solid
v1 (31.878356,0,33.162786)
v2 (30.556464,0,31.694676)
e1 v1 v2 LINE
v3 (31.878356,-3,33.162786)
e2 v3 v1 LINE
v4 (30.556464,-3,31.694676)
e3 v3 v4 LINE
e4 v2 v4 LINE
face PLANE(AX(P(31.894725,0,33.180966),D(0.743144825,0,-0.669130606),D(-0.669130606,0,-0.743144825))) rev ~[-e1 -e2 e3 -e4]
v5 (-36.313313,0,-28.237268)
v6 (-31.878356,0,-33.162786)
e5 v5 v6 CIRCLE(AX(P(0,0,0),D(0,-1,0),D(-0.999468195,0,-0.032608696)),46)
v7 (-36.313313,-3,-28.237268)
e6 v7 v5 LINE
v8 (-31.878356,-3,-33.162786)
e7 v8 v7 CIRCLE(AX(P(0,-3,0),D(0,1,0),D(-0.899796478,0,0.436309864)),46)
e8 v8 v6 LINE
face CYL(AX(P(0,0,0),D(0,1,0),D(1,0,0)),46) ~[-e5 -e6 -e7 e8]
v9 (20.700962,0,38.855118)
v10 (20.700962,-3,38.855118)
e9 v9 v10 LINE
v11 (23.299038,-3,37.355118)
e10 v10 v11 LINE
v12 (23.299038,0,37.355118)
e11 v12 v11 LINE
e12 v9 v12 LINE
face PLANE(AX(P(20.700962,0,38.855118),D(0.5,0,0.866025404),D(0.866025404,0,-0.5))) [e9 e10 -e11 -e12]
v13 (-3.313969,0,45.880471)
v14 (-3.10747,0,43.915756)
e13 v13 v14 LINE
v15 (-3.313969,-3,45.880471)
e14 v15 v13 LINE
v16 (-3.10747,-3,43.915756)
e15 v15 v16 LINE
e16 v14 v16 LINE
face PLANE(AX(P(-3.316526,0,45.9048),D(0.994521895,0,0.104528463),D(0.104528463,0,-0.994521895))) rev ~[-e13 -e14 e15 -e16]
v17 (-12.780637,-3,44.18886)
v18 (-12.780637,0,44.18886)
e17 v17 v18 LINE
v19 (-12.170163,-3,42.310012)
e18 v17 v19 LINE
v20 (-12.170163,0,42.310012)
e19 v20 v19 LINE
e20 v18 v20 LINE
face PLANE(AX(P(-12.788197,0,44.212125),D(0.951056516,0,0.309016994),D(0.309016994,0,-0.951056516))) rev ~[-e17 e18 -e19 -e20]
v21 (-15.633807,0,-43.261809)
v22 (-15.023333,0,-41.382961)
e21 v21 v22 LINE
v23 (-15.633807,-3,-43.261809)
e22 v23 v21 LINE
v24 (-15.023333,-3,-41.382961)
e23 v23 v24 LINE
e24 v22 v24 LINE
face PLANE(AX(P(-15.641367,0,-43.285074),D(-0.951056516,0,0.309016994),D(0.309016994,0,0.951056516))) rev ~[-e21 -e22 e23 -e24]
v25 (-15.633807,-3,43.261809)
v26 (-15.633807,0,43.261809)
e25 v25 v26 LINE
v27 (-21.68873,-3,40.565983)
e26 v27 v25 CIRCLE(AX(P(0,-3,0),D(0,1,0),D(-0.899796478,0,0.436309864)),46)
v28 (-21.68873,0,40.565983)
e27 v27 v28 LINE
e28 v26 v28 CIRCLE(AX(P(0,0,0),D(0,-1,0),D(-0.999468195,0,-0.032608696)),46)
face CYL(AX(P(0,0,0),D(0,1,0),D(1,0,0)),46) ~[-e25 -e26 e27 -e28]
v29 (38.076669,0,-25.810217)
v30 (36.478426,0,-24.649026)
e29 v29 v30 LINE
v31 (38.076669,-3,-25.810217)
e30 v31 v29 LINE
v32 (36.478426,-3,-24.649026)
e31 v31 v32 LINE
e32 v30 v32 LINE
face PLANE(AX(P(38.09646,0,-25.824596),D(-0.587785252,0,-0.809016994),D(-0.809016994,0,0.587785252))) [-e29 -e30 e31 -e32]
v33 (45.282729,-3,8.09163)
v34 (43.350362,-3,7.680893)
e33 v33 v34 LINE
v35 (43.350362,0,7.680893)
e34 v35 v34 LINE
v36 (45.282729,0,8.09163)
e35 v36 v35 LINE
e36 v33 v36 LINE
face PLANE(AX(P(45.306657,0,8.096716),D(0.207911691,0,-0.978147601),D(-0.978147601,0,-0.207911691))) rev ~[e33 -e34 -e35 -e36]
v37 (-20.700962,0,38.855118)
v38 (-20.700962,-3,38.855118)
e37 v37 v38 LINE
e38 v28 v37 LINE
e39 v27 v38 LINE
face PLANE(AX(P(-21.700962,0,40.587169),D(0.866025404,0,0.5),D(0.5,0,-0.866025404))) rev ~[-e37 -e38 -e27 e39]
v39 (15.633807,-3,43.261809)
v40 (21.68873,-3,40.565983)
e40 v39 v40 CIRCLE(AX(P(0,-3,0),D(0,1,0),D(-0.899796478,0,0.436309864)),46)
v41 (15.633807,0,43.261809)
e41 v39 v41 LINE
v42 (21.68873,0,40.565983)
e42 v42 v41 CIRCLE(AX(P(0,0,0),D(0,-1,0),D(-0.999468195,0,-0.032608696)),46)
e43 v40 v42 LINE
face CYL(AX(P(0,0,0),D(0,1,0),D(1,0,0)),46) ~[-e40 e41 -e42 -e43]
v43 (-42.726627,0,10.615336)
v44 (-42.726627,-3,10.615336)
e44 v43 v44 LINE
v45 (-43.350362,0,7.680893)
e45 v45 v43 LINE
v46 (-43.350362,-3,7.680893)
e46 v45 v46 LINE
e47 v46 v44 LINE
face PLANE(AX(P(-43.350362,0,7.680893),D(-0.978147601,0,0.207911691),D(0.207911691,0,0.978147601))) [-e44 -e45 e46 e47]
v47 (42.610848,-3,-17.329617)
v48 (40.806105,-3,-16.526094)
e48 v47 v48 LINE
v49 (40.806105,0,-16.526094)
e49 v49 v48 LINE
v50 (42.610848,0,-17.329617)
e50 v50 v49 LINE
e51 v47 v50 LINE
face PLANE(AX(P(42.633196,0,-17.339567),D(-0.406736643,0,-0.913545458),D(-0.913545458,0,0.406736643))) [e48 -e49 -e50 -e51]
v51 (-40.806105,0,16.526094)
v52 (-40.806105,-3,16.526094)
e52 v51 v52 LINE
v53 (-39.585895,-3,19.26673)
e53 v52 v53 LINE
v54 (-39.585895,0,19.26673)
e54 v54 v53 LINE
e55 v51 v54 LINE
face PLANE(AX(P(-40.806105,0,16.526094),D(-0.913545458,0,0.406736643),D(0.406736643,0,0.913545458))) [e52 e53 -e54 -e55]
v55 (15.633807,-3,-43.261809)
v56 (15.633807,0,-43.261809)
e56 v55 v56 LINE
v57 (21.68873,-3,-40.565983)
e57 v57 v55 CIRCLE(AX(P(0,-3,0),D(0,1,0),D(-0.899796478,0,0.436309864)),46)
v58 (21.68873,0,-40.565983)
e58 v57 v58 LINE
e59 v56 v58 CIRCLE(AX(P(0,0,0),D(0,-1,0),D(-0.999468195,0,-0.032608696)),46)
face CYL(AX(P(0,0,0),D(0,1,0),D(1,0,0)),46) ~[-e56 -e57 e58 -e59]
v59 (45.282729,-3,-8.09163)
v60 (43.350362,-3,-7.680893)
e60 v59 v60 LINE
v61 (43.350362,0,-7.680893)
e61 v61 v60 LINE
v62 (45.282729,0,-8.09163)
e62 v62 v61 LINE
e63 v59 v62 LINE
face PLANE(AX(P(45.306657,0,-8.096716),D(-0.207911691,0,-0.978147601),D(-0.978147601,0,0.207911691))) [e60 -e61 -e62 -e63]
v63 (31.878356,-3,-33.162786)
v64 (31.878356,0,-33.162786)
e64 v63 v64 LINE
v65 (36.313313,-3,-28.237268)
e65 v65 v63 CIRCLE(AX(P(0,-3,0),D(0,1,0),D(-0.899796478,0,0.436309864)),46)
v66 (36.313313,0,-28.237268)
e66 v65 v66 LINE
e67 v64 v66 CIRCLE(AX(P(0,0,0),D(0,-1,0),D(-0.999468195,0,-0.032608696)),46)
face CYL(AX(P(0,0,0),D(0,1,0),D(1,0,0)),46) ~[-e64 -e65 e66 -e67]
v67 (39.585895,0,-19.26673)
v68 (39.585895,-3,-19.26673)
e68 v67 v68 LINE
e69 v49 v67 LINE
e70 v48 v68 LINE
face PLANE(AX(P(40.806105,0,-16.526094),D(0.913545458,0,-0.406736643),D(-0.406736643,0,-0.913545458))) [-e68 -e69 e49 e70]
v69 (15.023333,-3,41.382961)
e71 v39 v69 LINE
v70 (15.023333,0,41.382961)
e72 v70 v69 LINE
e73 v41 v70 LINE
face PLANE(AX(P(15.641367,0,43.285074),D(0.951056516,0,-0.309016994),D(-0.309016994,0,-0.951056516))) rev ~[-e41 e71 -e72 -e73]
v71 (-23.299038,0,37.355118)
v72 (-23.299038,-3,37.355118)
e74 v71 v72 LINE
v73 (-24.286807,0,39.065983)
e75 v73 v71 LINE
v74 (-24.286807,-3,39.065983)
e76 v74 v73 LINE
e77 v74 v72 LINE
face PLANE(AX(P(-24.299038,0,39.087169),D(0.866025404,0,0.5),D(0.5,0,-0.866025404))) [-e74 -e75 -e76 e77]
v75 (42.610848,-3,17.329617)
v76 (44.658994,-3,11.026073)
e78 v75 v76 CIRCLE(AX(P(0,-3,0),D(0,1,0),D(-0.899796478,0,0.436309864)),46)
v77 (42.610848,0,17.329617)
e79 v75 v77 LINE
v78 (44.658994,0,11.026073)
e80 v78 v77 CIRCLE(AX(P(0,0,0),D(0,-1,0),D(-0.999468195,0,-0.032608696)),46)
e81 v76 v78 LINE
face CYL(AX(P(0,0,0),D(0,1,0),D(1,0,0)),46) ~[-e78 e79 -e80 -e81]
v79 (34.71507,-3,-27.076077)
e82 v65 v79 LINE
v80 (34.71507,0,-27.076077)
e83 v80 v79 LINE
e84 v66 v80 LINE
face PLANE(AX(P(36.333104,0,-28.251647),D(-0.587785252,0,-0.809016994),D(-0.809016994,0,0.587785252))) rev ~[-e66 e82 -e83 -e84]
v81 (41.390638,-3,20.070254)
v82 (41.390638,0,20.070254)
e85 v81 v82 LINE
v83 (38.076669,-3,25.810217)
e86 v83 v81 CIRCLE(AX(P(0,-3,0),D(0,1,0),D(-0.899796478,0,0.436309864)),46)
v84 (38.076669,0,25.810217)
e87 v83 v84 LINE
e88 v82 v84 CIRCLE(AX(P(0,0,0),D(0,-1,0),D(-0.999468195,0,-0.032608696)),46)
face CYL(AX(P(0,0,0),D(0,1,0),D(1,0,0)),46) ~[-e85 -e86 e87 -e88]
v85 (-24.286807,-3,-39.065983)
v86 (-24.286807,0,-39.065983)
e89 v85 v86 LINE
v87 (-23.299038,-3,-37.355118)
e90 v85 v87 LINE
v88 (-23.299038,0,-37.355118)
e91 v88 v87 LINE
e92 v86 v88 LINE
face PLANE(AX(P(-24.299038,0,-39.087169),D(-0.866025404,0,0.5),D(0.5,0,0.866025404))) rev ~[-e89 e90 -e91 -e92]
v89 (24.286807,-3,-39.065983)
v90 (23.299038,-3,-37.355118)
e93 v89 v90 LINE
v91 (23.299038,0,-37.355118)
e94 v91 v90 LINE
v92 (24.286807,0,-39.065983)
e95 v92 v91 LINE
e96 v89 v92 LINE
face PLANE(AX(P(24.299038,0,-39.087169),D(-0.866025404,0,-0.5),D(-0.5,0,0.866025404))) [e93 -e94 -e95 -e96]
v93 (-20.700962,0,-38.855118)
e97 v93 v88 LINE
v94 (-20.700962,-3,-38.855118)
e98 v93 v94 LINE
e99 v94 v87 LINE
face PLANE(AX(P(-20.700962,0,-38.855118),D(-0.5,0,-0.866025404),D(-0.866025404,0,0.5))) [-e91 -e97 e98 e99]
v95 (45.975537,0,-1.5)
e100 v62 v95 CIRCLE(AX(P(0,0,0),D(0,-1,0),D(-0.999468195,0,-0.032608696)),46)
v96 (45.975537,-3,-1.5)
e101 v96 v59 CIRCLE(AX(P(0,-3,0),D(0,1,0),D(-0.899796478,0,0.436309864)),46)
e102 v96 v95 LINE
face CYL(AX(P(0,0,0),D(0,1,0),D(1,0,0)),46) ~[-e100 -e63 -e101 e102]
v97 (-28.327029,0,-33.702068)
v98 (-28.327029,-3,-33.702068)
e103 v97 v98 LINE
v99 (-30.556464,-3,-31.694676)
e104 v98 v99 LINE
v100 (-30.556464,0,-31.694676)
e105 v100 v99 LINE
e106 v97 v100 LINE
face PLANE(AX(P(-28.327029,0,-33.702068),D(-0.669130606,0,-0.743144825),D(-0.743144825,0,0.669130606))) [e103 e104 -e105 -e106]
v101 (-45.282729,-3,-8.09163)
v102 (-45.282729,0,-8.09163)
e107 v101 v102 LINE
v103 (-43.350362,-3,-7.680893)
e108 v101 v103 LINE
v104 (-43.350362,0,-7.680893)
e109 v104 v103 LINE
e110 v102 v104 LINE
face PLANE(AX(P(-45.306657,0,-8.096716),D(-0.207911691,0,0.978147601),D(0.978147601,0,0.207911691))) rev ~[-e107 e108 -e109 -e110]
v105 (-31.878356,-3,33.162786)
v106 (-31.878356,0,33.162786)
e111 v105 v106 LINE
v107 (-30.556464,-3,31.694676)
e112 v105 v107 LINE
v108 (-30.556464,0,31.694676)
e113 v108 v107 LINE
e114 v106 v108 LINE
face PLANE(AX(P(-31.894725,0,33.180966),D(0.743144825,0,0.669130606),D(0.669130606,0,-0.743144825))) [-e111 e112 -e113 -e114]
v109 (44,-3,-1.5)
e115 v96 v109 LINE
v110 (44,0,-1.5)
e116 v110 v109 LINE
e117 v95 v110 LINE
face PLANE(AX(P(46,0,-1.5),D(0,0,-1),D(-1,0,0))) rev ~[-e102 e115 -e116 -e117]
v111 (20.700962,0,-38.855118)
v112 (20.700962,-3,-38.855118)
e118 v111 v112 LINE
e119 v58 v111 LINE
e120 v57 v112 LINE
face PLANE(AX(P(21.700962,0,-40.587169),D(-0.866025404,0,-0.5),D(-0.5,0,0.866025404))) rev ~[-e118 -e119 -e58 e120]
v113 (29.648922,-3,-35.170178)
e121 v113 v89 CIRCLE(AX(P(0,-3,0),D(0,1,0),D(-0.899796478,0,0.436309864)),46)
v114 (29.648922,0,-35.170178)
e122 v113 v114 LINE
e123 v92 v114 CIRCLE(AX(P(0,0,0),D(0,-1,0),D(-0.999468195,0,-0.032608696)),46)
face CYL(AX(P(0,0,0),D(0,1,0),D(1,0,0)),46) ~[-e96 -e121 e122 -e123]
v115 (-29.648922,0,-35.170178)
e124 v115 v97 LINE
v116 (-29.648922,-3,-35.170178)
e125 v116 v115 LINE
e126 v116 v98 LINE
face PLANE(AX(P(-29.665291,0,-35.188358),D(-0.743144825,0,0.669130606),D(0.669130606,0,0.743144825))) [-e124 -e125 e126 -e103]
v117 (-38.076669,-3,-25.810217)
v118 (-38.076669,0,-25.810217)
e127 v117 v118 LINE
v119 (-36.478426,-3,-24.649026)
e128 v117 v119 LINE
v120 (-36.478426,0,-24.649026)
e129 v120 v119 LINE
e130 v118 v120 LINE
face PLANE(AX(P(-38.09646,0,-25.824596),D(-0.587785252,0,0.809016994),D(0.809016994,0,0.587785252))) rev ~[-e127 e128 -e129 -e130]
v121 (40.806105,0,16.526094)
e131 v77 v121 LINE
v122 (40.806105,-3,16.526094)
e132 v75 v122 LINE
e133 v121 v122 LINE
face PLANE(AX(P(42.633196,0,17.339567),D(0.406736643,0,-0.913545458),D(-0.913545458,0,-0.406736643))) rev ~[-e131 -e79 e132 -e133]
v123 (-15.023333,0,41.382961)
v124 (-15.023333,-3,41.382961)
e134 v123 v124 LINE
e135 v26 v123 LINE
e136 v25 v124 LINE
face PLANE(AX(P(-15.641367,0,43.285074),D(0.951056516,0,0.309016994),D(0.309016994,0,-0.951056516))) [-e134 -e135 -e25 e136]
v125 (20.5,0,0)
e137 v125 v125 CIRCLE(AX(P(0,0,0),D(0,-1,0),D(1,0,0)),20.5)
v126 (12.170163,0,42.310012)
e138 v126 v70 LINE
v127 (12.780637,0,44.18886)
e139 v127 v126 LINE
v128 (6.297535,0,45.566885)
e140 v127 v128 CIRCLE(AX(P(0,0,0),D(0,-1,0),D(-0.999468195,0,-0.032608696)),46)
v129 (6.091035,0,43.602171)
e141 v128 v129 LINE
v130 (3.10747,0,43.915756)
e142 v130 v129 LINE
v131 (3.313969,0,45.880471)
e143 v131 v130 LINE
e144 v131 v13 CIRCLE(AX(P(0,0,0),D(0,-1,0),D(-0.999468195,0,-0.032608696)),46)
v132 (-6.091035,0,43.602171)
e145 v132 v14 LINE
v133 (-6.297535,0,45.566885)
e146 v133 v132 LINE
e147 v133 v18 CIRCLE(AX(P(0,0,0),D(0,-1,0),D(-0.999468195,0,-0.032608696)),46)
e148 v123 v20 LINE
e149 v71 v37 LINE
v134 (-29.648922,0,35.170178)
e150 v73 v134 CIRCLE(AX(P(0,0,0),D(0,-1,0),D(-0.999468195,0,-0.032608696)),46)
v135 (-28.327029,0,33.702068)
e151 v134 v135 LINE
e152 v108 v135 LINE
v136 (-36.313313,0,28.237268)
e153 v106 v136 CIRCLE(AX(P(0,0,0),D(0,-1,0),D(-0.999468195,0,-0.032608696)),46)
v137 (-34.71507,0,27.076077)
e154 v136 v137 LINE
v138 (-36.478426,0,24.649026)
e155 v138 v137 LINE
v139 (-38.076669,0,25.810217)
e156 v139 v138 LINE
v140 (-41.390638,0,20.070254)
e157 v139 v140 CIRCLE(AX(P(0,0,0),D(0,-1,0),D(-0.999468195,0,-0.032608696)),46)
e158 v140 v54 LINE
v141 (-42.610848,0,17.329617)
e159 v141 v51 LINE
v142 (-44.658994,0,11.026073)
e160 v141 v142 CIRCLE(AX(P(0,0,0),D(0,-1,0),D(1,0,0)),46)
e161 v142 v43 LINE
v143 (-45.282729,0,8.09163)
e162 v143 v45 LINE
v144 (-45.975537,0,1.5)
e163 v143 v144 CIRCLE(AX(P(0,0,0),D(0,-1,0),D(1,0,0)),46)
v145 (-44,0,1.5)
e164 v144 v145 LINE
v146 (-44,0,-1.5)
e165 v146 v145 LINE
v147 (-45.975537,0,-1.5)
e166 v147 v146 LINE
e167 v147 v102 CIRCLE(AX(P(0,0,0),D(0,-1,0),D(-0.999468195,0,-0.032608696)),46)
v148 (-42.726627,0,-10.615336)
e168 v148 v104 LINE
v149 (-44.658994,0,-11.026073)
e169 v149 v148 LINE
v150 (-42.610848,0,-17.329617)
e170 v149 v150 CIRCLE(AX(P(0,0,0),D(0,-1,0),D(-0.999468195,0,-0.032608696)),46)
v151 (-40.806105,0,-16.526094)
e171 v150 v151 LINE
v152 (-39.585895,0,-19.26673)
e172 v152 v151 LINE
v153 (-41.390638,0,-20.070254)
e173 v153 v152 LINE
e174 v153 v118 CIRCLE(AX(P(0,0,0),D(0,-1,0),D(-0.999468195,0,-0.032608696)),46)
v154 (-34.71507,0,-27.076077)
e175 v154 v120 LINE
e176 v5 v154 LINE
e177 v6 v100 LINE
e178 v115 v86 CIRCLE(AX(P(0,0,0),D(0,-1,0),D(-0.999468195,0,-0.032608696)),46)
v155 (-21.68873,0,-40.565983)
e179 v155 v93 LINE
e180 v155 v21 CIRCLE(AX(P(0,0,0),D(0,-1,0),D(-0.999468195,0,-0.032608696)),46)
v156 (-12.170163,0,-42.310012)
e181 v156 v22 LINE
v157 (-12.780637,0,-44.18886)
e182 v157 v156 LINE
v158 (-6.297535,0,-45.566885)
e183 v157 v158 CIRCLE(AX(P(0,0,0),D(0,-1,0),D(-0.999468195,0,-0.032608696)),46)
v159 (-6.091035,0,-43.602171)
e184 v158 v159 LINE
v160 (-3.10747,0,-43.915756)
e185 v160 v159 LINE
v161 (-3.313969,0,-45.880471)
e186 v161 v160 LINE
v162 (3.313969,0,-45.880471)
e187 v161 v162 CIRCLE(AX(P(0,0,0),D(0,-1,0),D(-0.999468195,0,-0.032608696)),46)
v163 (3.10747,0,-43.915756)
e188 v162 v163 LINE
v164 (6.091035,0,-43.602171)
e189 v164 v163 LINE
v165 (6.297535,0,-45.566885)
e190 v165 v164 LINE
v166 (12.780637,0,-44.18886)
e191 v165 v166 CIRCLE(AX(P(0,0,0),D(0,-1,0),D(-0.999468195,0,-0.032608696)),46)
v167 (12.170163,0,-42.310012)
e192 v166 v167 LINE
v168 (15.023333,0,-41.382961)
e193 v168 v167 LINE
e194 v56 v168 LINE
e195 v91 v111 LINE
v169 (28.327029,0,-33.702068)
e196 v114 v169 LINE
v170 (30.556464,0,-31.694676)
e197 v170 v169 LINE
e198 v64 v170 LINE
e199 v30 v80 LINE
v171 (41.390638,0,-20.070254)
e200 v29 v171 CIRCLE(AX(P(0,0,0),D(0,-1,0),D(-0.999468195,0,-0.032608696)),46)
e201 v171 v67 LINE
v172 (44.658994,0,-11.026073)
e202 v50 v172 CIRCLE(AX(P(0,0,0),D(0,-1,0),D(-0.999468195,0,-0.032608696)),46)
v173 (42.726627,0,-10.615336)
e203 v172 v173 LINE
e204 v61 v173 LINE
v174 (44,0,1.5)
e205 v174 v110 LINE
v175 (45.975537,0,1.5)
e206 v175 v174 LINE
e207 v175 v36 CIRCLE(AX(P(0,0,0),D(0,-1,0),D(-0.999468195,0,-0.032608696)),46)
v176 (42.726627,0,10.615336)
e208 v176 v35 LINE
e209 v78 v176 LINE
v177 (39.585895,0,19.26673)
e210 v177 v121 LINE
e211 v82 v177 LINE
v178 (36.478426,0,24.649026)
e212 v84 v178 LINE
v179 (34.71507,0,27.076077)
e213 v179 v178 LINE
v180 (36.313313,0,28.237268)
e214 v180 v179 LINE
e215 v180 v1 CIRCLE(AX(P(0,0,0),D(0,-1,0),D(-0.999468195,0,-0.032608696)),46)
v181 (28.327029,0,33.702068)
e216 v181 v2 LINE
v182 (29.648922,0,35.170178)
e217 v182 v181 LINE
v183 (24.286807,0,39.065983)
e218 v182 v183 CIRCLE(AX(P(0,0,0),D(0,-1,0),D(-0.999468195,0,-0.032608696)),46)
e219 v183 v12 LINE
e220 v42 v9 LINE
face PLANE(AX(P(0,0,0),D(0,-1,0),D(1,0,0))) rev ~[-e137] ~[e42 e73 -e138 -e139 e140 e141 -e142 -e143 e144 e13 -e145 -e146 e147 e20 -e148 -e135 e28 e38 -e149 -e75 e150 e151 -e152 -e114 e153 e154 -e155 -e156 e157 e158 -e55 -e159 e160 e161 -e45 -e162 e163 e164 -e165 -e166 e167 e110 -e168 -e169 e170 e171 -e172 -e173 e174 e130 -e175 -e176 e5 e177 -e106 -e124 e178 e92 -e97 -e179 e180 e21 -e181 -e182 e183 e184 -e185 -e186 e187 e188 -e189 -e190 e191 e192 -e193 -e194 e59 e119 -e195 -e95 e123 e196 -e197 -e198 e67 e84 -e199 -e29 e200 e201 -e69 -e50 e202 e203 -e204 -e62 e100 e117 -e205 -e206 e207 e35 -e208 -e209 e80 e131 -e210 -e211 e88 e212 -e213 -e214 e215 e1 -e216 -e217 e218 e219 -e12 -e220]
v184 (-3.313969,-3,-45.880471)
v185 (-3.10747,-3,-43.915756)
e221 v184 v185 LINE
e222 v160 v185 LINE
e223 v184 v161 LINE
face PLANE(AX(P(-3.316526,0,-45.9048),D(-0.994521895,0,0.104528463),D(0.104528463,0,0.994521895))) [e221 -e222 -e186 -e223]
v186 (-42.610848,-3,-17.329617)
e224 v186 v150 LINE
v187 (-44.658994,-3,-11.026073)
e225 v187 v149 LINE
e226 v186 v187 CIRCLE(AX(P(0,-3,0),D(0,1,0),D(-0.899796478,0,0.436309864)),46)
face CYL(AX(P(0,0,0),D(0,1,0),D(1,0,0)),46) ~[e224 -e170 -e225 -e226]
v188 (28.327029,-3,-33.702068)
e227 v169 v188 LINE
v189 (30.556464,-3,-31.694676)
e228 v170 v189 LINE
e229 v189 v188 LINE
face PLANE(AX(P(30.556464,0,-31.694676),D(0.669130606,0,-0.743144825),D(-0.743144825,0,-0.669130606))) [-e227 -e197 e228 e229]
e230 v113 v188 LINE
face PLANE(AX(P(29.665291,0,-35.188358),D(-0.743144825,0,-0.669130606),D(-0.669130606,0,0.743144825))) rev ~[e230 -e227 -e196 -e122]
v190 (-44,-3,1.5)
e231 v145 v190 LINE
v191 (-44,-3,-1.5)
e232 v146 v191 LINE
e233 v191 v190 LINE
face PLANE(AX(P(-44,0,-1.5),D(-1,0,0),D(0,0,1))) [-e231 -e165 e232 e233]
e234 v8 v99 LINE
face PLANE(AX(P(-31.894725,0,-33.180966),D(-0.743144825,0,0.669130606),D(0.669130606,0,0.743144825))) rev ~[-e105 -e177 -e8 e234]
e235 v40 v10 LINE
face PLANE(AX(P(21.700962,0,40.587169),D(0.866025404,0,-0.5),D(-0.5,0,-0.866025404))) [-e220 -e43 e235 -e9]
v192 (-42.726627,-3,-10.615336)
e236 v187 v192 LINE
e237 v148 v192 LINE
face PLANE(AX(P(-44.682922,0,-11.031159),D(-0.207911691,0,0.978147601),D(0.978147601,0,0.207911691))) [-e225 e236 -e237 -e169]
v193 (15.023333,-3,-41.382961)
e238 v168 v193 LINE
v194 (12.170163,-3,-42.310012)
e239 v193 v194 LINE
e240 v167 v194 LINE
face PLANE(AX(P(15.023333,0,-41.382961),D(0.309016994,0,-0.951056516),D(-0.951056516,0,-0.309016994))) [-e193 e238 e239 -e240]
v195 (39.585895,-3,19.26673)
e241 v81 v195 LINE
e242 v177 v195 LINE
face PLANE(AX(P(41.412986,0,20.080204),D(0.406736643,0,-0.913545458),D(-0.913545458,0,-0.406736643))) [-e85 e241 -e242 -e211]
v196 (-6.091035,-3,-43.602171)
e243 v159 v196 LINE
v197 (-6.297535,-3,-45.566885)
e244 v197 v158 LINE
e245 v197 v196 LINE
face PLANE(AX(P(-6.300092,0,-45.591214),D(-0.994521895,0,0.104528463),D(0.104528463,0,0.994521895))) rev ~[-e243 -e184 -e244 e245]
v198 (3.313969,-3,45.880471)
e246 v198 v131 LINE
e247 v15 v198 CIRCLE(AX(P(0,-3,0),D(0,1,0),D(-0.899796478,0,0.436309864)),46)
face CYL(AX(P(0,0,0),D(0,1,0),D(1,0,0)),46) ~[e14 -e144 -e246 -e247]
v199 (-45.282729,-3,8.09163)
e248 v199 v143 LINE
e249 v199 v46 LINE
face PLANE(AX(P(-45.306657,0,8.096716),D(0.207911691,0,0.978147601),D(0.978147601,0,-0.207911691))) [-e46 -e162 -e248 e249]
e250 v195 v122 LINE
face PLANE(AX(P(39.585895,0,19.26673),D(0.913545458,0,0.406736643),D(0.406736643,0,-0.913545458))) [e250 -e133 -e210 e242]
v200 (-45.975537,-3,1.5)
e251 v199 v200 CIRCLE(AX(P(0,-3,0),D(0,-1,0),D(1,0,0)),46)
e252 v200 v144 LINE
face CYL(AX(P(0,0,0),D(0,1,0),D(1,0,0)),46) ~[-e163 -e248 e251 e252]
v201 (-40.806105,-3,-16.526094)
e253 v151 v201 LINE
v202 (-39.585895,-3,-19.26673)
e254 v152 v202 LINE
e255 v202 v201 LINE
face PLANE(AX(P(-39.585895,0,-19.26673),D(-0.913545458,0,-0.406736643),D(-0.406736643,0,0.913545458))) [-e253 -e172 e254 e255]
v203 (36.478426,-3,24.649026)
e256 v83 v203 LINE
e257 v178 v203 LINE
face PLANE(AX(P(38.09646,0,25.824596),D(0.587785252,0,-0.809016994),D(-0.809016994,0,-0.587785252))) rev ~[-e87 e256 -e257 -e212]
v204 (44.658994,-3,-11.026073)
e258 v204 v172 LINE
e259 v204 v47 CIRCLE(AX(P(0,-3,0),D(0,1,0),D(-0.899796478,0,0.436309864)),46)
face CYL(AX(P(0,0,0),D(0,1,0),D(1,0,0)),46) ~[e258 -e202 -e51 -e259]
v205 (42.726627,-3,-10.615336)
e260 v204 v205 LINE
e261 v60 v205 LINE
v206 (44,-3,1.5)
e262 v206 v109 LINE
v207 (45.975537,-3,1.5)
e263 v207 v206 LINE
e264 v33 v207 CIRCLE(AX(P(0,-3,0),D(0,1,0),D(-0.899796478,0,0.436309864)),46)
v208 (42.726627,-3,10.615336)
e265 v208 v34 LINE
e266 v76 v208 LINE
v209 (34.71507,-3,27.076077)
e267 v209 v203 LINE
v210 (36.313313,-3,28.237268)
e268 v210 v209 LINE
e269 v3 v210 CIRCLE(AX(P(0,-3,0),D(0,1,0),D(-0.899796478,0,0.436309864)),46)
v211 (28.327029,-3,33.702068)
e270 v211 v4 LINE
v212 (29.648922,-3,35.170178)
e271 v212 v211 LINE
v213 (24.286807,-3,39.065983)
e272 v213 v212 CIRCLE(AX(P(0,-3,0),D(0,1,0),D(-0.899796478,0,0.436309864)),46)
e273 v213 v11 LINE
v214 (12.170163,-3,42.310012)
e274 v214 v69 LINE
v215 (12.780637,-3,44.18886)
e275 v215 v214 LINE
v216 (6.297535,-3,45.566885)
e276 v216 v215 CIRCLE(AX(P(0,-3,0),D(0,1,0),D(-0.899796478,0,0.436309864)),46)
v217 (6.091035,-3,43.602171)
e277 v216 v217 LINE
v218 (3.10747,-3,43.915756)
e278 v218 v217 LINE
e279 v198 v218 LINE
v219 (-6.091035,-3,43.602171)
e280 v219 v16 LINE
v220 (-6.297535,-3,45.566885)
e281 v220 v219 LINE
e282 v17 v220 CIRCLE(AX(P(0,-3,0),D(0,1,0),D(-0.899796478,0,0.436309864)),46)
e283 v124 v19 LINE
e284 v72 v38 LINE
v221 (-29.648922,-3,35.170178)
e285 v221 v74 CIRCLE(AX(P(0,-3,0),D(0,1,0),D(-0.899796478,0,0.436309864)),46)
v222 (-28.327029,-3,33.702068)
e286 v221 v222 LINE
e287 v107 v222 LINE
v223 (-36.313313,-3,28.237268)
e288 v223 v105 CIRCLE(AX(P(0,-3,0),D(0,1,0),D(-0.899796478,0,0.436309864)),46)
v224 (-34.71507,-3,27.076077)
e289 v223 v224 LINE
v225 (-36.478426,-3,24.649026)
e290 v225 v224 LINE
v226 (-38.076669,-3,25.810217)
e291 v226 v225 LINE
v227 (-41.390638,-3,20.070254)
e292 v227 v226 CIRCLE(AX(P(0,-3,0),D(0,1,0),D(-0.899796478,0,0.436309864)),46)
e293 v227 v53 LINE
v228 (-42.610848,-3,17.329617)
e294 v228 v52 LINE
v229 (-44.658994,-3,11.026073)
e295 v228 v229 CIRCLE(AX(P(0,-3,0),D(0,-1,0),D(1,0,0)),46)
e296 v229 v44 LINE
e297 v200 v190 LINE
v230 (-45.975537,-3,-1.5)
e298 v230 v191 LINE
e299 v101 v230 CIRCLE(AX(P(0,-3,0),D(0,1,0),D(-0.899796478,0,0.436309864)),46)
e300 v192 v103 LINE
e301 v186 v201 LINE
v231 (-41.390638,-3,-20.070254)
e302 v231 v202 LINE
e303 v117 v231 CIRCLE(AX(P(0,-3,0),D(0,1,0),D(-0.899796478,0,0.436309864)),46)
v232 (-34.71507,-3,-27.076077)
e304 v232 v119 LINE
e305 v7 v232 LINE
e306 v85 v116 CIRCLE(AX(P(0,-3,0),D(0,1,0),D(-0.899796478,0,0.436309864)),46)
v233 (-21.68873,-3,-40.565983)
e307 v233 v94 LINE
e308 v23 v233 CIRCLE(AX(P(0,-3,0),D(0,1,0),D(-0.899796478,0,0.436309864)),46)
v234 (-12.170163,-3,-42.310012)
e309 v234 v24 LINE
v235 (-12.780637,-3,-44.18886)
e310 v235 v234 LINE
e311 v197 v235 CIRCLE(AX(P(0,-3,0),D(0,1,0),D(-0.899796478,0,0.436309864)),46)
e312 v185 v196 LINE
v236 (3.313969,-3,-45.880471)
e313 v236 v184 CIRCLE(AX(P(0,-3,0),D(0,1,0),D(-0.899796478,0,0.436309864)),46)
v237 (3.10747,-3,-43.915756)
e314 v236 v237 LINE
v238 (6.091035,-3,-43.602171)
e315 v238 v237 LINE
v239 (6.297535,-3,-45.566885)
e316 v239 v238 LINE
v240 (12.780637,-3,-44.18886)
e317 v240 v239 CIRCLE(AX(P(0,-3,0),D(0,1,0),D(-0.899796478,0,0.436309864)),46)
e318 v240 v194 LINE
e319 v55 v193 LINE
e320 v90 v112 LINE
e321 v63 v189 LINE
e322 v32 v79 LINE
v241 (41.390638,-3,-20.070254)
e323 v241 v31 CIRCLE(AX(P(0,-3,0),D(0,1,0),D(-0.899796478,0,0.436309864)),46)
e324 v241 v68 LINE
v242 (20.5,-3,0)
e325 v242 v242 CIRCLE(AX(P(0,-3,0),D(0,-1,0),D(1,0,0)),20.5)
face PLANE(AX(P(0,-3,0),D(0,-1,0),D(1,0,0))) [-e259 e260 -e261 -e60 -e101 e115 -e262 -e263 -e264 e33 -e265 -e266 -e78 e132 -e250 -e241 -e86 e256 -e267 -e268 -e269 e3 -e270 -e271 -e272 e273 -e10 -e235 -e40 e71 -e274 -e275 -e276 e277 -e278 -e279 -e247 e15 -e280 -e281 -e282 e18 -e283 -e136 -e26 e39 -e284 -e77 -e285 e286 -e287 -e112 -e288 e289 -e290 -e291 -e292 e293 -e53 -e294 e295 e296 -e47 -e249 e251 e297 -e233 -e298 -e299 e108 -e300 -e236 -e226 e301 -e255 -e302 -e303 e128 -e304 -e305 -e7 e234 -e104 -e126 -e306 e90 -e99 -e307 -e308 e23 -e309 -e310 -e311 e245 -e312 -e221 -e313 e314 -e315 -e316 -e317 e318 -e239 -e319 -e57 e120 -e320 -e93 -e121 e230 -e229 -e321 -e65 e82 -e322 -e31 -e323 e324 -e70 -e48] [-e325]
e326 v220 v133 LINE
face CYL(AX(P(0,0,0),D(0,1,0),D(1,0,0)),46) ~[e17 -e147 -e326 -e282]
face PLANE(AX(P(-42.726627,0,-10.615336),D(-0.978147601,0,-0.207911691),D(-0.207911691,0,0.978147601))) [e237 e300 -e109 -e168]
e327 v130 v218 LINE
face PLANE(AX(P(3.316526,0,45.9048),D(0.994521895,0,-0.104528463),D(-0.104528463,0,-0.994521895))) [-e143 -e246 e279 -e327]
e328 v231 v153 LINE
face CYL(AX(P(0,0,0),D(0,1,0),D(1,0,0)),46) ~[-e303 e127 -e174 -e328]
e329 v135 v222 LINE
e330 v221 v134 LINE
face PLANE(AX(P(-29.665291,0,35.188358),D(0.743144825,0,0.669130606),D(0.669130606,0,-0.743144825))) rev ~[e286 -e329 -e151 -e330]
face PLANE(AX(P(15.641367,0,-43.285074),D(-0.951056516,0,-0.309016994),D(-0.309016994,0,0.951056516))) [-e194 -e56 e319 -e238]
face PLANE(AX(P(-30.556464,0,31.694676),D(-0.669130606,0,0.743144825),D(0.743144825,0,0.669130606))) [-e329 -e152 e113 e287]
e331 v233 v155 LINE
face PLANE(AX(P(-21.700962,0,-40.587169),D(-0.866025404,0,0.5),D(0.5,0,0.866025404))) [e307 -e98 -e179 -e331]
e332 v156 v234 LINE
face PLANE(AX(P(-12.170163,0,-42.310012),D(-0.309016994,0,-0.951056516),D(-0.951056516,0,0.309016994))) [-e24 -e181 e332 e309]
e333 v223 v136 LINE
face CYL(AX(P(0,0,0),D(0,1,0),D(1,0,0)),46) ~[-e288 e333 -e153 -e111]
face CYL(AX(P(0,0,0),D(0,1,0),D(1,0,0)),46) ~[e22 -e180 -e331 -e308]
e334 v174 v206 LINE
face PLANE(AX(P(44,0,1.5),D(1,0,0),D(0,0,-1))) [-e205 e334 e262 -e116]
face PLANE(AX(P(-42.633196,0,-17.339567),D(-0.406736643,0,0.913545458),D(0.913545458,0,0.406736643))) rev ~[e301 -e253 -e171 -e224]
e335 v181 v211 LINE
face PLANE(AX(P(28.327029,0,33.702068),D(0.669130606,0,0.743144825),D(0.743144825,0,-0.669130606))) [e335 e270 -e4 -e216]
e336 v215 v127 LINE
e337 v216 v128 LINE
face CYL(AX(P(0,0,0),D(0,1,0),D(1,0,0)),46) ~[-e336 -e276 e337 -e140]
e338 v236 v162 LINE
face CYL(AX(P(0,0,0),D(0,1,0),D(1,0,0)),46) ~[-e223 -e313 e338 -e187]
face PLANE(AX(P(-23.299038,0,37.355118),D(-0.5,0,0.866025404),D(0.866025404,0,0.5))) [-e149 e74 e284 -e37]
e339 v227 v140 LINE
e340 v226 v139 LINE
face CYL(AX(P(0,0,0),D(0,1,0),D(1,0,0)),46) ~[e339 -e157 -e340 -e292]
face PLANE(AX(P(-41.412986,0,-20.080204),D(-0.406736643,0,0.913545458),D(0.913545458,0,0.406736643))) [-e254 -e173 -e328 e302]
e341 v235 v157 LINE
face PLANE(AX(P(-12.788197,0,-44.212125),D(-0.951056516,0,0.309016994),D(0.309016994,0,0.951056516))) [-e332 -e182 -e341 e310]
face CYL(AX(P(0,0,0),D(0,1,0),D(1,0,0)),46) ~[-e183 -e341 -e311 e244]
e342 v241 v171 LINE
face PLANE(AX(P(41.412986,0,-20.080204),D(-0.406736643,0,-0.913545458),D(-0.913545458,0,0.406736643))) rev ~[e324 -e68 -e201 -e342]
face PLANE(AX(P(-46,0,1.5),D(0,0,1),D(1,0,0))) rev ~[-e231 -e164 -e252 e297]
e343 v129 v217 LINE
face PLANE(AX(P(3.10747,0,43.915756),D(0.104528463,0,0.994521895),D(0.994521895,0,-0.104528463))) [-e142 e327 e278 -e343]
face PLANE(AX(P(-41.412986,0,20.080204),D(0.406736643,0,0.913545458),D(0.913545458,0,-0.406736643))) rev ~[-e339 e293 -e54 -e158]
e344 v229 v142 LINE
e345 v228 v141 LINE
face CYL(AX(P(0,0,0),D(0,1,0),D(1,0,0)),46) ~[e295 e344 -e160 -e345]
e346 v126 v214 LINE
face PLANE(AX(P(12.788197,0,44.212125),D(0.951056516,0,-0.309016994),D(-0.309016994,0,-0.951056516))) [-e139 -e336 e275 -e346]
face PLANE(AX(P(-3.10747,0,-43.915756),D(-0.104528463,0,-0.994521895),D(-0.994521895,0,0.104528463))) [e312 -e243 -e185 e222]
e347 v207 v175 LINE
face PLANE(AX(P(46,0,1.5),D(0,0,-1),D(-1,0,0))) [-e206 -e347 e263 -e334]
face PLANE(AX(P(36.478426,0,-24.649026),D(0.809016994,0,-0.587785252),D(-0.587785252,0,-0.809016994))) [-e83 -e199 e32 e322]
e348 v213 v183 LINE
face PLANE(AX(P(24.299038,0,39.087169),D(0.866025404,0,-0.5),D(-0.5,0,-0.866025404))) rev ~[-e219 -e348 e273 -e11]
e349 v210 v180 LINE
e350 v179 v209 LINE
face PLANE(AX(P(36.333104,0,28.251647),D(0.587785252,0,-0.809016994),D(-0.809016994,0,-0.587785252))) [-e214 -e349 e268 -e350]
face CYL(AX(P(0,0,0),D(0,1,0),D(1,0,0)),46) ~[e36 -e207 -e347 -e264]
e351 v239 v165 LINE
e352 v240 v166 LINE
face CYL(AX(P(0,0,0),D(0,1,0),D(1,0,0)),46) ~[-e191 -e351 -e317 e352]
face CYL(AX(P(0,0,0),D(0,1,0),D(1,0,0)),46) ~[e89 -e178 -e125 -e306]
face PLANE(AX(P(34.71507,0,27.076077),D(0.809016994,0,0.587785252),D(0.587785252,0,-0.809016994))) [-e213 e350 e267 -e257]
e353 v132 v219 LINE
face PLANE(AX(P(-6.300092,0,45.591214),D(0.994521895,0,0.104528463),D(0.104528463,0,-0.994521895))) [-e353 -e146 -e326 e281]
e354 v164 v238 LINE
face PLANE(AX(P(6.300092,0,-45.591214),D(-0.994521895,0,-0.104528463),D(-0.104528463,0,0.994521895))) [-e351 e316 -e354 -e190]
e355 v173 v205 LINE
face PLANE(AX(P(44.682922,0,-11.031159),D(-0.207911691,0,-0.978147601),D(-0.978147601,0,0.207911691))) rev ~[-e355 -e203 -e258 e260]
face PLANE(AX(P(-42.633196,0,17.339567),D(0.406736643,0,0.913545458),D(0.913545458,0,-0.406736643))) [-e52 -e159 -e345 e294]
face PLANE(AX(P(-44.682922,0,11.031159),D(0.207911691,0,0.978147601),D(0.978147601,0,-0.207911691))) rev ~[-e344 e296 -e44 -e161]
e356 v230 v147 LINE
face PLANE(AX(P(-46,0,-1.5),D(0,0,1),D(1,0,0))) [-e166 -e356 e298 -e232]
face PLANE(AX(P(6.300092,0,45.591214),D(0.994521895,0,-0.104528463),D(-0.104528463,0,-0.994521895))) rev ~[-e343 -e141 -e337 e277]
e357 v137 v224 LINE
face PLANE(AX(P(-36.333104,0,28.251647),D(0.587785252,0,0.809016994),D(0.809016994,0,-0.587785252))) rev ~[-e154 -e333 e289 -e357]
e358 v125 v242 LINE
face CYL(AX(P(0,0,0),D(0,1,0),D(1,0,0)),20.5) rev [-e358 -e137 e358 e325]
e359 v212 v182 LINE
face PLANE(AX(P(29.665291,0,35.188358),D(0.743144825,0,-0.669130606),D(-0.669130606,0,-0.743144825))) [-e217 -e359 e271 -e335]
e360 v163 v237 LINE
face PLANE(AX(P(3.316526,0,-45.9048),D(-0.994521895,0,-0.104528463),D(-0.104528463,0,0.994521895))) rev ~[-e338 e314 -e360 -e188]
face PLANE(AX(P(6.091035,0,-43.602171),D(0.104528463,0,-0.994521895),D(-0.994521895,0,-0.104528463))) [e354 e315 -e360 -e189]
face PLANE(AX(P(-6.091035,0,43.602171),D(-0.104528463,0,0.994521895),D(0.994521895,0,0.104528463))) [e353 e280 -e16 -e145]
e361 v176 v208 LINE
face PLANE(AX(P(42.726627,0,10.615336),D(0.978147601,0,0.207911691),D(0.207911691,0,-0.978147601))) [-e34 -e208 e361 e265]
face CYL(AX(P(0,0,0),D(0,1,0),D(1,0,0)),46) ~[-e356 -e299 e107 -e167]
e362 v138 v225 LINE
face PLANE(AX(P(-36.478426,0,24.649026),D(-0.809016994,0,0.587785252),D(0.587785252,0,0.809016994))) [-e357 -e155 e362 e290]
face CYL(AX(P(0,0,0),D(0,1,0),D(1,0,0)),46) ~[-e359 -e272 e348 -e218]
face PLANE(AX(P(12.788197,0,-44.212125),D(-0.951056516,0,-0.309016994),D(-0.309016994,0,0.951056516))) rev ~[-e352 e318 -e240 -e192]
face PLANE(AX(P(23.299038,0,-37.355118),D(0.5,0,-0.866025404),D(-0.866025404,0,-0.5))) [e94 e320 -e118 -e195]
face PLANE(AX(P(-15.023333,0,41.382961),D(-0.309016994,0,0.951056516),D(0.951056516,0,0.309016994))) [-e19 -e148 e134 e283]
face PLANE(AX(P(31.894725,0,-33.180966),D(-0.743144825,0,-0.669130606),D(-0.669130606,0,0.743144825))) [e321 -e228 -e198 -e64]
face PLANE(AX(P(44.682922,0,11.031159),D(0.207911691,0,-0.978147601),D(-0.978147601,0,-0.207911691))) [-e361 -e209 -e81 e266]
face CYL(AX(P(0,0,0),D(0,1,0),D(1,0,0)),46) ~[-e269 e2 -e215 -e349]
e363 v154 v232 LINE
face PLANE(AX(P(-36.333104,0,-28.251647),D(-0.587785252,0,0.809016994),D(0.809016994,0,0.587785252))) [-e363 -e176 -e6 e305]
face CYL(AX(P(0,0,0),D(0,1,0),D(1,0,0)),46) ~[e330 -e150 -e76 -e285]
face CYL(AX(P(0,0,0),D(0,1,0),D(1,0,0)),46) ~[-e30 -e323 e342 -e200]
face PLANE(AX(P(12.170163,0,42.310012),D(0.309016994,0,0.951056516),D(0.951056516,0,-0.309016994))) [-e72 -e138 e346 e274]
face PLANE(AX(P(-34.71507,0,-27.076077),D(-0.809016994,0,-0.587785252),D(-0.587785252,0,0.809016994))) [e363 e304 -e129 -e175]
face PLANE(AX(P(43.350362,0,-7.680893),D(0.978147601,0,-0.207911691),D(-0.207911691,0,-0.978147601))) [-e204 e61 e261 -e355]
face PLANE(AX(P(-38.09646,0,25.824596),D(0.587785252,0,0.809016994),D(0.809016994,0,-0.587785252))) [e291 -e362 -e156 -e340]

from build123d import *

# Parameters (mm, degrees)
F0_R            = 46
F0_R_2          = 20.5
F1_DEPTH        = 3
F2_W            = 2
F2_H            = 3
F3_DEPTH        = 3
F3_COPIES_COUNT = 30


# Not quite as in the source:
# - a pattern or mirror of a feature is missing from the dataset's text; its kind, count and spacing are read off the source's solid


with BuildPart() as f1:
    # F0 (on Front) → F1 (new body)
    with BuildSketch(Plane.XZ):
        Circle(F0_R)
        Circle(F0_R_2, mode=Mode.SUBTRACT)
    extrude(amount=F1_DEPTH)

    # F2 (on Front) → F3 (cut)
    with BuildSketch(Plane.XZ):
        with Locations((-45, 0)):
            Rectangle(F2_W, F2_H)
    f3 = extrude(amount=F3_DEPTH, mode=Mode.SUBTRACT)

    # F3_copies: F3 ×30 about axis
    f3_copies_axis = Axis((0, 0, 0), (0, 1, 0))
    for i in range(1, F3_COPIES_COUNT):
        add(f3.rotate(f3_copies_axis, i * 360 / F3_COPIES_COUNT), mode=Mode.SUBTRACT)


solid = f1.part
